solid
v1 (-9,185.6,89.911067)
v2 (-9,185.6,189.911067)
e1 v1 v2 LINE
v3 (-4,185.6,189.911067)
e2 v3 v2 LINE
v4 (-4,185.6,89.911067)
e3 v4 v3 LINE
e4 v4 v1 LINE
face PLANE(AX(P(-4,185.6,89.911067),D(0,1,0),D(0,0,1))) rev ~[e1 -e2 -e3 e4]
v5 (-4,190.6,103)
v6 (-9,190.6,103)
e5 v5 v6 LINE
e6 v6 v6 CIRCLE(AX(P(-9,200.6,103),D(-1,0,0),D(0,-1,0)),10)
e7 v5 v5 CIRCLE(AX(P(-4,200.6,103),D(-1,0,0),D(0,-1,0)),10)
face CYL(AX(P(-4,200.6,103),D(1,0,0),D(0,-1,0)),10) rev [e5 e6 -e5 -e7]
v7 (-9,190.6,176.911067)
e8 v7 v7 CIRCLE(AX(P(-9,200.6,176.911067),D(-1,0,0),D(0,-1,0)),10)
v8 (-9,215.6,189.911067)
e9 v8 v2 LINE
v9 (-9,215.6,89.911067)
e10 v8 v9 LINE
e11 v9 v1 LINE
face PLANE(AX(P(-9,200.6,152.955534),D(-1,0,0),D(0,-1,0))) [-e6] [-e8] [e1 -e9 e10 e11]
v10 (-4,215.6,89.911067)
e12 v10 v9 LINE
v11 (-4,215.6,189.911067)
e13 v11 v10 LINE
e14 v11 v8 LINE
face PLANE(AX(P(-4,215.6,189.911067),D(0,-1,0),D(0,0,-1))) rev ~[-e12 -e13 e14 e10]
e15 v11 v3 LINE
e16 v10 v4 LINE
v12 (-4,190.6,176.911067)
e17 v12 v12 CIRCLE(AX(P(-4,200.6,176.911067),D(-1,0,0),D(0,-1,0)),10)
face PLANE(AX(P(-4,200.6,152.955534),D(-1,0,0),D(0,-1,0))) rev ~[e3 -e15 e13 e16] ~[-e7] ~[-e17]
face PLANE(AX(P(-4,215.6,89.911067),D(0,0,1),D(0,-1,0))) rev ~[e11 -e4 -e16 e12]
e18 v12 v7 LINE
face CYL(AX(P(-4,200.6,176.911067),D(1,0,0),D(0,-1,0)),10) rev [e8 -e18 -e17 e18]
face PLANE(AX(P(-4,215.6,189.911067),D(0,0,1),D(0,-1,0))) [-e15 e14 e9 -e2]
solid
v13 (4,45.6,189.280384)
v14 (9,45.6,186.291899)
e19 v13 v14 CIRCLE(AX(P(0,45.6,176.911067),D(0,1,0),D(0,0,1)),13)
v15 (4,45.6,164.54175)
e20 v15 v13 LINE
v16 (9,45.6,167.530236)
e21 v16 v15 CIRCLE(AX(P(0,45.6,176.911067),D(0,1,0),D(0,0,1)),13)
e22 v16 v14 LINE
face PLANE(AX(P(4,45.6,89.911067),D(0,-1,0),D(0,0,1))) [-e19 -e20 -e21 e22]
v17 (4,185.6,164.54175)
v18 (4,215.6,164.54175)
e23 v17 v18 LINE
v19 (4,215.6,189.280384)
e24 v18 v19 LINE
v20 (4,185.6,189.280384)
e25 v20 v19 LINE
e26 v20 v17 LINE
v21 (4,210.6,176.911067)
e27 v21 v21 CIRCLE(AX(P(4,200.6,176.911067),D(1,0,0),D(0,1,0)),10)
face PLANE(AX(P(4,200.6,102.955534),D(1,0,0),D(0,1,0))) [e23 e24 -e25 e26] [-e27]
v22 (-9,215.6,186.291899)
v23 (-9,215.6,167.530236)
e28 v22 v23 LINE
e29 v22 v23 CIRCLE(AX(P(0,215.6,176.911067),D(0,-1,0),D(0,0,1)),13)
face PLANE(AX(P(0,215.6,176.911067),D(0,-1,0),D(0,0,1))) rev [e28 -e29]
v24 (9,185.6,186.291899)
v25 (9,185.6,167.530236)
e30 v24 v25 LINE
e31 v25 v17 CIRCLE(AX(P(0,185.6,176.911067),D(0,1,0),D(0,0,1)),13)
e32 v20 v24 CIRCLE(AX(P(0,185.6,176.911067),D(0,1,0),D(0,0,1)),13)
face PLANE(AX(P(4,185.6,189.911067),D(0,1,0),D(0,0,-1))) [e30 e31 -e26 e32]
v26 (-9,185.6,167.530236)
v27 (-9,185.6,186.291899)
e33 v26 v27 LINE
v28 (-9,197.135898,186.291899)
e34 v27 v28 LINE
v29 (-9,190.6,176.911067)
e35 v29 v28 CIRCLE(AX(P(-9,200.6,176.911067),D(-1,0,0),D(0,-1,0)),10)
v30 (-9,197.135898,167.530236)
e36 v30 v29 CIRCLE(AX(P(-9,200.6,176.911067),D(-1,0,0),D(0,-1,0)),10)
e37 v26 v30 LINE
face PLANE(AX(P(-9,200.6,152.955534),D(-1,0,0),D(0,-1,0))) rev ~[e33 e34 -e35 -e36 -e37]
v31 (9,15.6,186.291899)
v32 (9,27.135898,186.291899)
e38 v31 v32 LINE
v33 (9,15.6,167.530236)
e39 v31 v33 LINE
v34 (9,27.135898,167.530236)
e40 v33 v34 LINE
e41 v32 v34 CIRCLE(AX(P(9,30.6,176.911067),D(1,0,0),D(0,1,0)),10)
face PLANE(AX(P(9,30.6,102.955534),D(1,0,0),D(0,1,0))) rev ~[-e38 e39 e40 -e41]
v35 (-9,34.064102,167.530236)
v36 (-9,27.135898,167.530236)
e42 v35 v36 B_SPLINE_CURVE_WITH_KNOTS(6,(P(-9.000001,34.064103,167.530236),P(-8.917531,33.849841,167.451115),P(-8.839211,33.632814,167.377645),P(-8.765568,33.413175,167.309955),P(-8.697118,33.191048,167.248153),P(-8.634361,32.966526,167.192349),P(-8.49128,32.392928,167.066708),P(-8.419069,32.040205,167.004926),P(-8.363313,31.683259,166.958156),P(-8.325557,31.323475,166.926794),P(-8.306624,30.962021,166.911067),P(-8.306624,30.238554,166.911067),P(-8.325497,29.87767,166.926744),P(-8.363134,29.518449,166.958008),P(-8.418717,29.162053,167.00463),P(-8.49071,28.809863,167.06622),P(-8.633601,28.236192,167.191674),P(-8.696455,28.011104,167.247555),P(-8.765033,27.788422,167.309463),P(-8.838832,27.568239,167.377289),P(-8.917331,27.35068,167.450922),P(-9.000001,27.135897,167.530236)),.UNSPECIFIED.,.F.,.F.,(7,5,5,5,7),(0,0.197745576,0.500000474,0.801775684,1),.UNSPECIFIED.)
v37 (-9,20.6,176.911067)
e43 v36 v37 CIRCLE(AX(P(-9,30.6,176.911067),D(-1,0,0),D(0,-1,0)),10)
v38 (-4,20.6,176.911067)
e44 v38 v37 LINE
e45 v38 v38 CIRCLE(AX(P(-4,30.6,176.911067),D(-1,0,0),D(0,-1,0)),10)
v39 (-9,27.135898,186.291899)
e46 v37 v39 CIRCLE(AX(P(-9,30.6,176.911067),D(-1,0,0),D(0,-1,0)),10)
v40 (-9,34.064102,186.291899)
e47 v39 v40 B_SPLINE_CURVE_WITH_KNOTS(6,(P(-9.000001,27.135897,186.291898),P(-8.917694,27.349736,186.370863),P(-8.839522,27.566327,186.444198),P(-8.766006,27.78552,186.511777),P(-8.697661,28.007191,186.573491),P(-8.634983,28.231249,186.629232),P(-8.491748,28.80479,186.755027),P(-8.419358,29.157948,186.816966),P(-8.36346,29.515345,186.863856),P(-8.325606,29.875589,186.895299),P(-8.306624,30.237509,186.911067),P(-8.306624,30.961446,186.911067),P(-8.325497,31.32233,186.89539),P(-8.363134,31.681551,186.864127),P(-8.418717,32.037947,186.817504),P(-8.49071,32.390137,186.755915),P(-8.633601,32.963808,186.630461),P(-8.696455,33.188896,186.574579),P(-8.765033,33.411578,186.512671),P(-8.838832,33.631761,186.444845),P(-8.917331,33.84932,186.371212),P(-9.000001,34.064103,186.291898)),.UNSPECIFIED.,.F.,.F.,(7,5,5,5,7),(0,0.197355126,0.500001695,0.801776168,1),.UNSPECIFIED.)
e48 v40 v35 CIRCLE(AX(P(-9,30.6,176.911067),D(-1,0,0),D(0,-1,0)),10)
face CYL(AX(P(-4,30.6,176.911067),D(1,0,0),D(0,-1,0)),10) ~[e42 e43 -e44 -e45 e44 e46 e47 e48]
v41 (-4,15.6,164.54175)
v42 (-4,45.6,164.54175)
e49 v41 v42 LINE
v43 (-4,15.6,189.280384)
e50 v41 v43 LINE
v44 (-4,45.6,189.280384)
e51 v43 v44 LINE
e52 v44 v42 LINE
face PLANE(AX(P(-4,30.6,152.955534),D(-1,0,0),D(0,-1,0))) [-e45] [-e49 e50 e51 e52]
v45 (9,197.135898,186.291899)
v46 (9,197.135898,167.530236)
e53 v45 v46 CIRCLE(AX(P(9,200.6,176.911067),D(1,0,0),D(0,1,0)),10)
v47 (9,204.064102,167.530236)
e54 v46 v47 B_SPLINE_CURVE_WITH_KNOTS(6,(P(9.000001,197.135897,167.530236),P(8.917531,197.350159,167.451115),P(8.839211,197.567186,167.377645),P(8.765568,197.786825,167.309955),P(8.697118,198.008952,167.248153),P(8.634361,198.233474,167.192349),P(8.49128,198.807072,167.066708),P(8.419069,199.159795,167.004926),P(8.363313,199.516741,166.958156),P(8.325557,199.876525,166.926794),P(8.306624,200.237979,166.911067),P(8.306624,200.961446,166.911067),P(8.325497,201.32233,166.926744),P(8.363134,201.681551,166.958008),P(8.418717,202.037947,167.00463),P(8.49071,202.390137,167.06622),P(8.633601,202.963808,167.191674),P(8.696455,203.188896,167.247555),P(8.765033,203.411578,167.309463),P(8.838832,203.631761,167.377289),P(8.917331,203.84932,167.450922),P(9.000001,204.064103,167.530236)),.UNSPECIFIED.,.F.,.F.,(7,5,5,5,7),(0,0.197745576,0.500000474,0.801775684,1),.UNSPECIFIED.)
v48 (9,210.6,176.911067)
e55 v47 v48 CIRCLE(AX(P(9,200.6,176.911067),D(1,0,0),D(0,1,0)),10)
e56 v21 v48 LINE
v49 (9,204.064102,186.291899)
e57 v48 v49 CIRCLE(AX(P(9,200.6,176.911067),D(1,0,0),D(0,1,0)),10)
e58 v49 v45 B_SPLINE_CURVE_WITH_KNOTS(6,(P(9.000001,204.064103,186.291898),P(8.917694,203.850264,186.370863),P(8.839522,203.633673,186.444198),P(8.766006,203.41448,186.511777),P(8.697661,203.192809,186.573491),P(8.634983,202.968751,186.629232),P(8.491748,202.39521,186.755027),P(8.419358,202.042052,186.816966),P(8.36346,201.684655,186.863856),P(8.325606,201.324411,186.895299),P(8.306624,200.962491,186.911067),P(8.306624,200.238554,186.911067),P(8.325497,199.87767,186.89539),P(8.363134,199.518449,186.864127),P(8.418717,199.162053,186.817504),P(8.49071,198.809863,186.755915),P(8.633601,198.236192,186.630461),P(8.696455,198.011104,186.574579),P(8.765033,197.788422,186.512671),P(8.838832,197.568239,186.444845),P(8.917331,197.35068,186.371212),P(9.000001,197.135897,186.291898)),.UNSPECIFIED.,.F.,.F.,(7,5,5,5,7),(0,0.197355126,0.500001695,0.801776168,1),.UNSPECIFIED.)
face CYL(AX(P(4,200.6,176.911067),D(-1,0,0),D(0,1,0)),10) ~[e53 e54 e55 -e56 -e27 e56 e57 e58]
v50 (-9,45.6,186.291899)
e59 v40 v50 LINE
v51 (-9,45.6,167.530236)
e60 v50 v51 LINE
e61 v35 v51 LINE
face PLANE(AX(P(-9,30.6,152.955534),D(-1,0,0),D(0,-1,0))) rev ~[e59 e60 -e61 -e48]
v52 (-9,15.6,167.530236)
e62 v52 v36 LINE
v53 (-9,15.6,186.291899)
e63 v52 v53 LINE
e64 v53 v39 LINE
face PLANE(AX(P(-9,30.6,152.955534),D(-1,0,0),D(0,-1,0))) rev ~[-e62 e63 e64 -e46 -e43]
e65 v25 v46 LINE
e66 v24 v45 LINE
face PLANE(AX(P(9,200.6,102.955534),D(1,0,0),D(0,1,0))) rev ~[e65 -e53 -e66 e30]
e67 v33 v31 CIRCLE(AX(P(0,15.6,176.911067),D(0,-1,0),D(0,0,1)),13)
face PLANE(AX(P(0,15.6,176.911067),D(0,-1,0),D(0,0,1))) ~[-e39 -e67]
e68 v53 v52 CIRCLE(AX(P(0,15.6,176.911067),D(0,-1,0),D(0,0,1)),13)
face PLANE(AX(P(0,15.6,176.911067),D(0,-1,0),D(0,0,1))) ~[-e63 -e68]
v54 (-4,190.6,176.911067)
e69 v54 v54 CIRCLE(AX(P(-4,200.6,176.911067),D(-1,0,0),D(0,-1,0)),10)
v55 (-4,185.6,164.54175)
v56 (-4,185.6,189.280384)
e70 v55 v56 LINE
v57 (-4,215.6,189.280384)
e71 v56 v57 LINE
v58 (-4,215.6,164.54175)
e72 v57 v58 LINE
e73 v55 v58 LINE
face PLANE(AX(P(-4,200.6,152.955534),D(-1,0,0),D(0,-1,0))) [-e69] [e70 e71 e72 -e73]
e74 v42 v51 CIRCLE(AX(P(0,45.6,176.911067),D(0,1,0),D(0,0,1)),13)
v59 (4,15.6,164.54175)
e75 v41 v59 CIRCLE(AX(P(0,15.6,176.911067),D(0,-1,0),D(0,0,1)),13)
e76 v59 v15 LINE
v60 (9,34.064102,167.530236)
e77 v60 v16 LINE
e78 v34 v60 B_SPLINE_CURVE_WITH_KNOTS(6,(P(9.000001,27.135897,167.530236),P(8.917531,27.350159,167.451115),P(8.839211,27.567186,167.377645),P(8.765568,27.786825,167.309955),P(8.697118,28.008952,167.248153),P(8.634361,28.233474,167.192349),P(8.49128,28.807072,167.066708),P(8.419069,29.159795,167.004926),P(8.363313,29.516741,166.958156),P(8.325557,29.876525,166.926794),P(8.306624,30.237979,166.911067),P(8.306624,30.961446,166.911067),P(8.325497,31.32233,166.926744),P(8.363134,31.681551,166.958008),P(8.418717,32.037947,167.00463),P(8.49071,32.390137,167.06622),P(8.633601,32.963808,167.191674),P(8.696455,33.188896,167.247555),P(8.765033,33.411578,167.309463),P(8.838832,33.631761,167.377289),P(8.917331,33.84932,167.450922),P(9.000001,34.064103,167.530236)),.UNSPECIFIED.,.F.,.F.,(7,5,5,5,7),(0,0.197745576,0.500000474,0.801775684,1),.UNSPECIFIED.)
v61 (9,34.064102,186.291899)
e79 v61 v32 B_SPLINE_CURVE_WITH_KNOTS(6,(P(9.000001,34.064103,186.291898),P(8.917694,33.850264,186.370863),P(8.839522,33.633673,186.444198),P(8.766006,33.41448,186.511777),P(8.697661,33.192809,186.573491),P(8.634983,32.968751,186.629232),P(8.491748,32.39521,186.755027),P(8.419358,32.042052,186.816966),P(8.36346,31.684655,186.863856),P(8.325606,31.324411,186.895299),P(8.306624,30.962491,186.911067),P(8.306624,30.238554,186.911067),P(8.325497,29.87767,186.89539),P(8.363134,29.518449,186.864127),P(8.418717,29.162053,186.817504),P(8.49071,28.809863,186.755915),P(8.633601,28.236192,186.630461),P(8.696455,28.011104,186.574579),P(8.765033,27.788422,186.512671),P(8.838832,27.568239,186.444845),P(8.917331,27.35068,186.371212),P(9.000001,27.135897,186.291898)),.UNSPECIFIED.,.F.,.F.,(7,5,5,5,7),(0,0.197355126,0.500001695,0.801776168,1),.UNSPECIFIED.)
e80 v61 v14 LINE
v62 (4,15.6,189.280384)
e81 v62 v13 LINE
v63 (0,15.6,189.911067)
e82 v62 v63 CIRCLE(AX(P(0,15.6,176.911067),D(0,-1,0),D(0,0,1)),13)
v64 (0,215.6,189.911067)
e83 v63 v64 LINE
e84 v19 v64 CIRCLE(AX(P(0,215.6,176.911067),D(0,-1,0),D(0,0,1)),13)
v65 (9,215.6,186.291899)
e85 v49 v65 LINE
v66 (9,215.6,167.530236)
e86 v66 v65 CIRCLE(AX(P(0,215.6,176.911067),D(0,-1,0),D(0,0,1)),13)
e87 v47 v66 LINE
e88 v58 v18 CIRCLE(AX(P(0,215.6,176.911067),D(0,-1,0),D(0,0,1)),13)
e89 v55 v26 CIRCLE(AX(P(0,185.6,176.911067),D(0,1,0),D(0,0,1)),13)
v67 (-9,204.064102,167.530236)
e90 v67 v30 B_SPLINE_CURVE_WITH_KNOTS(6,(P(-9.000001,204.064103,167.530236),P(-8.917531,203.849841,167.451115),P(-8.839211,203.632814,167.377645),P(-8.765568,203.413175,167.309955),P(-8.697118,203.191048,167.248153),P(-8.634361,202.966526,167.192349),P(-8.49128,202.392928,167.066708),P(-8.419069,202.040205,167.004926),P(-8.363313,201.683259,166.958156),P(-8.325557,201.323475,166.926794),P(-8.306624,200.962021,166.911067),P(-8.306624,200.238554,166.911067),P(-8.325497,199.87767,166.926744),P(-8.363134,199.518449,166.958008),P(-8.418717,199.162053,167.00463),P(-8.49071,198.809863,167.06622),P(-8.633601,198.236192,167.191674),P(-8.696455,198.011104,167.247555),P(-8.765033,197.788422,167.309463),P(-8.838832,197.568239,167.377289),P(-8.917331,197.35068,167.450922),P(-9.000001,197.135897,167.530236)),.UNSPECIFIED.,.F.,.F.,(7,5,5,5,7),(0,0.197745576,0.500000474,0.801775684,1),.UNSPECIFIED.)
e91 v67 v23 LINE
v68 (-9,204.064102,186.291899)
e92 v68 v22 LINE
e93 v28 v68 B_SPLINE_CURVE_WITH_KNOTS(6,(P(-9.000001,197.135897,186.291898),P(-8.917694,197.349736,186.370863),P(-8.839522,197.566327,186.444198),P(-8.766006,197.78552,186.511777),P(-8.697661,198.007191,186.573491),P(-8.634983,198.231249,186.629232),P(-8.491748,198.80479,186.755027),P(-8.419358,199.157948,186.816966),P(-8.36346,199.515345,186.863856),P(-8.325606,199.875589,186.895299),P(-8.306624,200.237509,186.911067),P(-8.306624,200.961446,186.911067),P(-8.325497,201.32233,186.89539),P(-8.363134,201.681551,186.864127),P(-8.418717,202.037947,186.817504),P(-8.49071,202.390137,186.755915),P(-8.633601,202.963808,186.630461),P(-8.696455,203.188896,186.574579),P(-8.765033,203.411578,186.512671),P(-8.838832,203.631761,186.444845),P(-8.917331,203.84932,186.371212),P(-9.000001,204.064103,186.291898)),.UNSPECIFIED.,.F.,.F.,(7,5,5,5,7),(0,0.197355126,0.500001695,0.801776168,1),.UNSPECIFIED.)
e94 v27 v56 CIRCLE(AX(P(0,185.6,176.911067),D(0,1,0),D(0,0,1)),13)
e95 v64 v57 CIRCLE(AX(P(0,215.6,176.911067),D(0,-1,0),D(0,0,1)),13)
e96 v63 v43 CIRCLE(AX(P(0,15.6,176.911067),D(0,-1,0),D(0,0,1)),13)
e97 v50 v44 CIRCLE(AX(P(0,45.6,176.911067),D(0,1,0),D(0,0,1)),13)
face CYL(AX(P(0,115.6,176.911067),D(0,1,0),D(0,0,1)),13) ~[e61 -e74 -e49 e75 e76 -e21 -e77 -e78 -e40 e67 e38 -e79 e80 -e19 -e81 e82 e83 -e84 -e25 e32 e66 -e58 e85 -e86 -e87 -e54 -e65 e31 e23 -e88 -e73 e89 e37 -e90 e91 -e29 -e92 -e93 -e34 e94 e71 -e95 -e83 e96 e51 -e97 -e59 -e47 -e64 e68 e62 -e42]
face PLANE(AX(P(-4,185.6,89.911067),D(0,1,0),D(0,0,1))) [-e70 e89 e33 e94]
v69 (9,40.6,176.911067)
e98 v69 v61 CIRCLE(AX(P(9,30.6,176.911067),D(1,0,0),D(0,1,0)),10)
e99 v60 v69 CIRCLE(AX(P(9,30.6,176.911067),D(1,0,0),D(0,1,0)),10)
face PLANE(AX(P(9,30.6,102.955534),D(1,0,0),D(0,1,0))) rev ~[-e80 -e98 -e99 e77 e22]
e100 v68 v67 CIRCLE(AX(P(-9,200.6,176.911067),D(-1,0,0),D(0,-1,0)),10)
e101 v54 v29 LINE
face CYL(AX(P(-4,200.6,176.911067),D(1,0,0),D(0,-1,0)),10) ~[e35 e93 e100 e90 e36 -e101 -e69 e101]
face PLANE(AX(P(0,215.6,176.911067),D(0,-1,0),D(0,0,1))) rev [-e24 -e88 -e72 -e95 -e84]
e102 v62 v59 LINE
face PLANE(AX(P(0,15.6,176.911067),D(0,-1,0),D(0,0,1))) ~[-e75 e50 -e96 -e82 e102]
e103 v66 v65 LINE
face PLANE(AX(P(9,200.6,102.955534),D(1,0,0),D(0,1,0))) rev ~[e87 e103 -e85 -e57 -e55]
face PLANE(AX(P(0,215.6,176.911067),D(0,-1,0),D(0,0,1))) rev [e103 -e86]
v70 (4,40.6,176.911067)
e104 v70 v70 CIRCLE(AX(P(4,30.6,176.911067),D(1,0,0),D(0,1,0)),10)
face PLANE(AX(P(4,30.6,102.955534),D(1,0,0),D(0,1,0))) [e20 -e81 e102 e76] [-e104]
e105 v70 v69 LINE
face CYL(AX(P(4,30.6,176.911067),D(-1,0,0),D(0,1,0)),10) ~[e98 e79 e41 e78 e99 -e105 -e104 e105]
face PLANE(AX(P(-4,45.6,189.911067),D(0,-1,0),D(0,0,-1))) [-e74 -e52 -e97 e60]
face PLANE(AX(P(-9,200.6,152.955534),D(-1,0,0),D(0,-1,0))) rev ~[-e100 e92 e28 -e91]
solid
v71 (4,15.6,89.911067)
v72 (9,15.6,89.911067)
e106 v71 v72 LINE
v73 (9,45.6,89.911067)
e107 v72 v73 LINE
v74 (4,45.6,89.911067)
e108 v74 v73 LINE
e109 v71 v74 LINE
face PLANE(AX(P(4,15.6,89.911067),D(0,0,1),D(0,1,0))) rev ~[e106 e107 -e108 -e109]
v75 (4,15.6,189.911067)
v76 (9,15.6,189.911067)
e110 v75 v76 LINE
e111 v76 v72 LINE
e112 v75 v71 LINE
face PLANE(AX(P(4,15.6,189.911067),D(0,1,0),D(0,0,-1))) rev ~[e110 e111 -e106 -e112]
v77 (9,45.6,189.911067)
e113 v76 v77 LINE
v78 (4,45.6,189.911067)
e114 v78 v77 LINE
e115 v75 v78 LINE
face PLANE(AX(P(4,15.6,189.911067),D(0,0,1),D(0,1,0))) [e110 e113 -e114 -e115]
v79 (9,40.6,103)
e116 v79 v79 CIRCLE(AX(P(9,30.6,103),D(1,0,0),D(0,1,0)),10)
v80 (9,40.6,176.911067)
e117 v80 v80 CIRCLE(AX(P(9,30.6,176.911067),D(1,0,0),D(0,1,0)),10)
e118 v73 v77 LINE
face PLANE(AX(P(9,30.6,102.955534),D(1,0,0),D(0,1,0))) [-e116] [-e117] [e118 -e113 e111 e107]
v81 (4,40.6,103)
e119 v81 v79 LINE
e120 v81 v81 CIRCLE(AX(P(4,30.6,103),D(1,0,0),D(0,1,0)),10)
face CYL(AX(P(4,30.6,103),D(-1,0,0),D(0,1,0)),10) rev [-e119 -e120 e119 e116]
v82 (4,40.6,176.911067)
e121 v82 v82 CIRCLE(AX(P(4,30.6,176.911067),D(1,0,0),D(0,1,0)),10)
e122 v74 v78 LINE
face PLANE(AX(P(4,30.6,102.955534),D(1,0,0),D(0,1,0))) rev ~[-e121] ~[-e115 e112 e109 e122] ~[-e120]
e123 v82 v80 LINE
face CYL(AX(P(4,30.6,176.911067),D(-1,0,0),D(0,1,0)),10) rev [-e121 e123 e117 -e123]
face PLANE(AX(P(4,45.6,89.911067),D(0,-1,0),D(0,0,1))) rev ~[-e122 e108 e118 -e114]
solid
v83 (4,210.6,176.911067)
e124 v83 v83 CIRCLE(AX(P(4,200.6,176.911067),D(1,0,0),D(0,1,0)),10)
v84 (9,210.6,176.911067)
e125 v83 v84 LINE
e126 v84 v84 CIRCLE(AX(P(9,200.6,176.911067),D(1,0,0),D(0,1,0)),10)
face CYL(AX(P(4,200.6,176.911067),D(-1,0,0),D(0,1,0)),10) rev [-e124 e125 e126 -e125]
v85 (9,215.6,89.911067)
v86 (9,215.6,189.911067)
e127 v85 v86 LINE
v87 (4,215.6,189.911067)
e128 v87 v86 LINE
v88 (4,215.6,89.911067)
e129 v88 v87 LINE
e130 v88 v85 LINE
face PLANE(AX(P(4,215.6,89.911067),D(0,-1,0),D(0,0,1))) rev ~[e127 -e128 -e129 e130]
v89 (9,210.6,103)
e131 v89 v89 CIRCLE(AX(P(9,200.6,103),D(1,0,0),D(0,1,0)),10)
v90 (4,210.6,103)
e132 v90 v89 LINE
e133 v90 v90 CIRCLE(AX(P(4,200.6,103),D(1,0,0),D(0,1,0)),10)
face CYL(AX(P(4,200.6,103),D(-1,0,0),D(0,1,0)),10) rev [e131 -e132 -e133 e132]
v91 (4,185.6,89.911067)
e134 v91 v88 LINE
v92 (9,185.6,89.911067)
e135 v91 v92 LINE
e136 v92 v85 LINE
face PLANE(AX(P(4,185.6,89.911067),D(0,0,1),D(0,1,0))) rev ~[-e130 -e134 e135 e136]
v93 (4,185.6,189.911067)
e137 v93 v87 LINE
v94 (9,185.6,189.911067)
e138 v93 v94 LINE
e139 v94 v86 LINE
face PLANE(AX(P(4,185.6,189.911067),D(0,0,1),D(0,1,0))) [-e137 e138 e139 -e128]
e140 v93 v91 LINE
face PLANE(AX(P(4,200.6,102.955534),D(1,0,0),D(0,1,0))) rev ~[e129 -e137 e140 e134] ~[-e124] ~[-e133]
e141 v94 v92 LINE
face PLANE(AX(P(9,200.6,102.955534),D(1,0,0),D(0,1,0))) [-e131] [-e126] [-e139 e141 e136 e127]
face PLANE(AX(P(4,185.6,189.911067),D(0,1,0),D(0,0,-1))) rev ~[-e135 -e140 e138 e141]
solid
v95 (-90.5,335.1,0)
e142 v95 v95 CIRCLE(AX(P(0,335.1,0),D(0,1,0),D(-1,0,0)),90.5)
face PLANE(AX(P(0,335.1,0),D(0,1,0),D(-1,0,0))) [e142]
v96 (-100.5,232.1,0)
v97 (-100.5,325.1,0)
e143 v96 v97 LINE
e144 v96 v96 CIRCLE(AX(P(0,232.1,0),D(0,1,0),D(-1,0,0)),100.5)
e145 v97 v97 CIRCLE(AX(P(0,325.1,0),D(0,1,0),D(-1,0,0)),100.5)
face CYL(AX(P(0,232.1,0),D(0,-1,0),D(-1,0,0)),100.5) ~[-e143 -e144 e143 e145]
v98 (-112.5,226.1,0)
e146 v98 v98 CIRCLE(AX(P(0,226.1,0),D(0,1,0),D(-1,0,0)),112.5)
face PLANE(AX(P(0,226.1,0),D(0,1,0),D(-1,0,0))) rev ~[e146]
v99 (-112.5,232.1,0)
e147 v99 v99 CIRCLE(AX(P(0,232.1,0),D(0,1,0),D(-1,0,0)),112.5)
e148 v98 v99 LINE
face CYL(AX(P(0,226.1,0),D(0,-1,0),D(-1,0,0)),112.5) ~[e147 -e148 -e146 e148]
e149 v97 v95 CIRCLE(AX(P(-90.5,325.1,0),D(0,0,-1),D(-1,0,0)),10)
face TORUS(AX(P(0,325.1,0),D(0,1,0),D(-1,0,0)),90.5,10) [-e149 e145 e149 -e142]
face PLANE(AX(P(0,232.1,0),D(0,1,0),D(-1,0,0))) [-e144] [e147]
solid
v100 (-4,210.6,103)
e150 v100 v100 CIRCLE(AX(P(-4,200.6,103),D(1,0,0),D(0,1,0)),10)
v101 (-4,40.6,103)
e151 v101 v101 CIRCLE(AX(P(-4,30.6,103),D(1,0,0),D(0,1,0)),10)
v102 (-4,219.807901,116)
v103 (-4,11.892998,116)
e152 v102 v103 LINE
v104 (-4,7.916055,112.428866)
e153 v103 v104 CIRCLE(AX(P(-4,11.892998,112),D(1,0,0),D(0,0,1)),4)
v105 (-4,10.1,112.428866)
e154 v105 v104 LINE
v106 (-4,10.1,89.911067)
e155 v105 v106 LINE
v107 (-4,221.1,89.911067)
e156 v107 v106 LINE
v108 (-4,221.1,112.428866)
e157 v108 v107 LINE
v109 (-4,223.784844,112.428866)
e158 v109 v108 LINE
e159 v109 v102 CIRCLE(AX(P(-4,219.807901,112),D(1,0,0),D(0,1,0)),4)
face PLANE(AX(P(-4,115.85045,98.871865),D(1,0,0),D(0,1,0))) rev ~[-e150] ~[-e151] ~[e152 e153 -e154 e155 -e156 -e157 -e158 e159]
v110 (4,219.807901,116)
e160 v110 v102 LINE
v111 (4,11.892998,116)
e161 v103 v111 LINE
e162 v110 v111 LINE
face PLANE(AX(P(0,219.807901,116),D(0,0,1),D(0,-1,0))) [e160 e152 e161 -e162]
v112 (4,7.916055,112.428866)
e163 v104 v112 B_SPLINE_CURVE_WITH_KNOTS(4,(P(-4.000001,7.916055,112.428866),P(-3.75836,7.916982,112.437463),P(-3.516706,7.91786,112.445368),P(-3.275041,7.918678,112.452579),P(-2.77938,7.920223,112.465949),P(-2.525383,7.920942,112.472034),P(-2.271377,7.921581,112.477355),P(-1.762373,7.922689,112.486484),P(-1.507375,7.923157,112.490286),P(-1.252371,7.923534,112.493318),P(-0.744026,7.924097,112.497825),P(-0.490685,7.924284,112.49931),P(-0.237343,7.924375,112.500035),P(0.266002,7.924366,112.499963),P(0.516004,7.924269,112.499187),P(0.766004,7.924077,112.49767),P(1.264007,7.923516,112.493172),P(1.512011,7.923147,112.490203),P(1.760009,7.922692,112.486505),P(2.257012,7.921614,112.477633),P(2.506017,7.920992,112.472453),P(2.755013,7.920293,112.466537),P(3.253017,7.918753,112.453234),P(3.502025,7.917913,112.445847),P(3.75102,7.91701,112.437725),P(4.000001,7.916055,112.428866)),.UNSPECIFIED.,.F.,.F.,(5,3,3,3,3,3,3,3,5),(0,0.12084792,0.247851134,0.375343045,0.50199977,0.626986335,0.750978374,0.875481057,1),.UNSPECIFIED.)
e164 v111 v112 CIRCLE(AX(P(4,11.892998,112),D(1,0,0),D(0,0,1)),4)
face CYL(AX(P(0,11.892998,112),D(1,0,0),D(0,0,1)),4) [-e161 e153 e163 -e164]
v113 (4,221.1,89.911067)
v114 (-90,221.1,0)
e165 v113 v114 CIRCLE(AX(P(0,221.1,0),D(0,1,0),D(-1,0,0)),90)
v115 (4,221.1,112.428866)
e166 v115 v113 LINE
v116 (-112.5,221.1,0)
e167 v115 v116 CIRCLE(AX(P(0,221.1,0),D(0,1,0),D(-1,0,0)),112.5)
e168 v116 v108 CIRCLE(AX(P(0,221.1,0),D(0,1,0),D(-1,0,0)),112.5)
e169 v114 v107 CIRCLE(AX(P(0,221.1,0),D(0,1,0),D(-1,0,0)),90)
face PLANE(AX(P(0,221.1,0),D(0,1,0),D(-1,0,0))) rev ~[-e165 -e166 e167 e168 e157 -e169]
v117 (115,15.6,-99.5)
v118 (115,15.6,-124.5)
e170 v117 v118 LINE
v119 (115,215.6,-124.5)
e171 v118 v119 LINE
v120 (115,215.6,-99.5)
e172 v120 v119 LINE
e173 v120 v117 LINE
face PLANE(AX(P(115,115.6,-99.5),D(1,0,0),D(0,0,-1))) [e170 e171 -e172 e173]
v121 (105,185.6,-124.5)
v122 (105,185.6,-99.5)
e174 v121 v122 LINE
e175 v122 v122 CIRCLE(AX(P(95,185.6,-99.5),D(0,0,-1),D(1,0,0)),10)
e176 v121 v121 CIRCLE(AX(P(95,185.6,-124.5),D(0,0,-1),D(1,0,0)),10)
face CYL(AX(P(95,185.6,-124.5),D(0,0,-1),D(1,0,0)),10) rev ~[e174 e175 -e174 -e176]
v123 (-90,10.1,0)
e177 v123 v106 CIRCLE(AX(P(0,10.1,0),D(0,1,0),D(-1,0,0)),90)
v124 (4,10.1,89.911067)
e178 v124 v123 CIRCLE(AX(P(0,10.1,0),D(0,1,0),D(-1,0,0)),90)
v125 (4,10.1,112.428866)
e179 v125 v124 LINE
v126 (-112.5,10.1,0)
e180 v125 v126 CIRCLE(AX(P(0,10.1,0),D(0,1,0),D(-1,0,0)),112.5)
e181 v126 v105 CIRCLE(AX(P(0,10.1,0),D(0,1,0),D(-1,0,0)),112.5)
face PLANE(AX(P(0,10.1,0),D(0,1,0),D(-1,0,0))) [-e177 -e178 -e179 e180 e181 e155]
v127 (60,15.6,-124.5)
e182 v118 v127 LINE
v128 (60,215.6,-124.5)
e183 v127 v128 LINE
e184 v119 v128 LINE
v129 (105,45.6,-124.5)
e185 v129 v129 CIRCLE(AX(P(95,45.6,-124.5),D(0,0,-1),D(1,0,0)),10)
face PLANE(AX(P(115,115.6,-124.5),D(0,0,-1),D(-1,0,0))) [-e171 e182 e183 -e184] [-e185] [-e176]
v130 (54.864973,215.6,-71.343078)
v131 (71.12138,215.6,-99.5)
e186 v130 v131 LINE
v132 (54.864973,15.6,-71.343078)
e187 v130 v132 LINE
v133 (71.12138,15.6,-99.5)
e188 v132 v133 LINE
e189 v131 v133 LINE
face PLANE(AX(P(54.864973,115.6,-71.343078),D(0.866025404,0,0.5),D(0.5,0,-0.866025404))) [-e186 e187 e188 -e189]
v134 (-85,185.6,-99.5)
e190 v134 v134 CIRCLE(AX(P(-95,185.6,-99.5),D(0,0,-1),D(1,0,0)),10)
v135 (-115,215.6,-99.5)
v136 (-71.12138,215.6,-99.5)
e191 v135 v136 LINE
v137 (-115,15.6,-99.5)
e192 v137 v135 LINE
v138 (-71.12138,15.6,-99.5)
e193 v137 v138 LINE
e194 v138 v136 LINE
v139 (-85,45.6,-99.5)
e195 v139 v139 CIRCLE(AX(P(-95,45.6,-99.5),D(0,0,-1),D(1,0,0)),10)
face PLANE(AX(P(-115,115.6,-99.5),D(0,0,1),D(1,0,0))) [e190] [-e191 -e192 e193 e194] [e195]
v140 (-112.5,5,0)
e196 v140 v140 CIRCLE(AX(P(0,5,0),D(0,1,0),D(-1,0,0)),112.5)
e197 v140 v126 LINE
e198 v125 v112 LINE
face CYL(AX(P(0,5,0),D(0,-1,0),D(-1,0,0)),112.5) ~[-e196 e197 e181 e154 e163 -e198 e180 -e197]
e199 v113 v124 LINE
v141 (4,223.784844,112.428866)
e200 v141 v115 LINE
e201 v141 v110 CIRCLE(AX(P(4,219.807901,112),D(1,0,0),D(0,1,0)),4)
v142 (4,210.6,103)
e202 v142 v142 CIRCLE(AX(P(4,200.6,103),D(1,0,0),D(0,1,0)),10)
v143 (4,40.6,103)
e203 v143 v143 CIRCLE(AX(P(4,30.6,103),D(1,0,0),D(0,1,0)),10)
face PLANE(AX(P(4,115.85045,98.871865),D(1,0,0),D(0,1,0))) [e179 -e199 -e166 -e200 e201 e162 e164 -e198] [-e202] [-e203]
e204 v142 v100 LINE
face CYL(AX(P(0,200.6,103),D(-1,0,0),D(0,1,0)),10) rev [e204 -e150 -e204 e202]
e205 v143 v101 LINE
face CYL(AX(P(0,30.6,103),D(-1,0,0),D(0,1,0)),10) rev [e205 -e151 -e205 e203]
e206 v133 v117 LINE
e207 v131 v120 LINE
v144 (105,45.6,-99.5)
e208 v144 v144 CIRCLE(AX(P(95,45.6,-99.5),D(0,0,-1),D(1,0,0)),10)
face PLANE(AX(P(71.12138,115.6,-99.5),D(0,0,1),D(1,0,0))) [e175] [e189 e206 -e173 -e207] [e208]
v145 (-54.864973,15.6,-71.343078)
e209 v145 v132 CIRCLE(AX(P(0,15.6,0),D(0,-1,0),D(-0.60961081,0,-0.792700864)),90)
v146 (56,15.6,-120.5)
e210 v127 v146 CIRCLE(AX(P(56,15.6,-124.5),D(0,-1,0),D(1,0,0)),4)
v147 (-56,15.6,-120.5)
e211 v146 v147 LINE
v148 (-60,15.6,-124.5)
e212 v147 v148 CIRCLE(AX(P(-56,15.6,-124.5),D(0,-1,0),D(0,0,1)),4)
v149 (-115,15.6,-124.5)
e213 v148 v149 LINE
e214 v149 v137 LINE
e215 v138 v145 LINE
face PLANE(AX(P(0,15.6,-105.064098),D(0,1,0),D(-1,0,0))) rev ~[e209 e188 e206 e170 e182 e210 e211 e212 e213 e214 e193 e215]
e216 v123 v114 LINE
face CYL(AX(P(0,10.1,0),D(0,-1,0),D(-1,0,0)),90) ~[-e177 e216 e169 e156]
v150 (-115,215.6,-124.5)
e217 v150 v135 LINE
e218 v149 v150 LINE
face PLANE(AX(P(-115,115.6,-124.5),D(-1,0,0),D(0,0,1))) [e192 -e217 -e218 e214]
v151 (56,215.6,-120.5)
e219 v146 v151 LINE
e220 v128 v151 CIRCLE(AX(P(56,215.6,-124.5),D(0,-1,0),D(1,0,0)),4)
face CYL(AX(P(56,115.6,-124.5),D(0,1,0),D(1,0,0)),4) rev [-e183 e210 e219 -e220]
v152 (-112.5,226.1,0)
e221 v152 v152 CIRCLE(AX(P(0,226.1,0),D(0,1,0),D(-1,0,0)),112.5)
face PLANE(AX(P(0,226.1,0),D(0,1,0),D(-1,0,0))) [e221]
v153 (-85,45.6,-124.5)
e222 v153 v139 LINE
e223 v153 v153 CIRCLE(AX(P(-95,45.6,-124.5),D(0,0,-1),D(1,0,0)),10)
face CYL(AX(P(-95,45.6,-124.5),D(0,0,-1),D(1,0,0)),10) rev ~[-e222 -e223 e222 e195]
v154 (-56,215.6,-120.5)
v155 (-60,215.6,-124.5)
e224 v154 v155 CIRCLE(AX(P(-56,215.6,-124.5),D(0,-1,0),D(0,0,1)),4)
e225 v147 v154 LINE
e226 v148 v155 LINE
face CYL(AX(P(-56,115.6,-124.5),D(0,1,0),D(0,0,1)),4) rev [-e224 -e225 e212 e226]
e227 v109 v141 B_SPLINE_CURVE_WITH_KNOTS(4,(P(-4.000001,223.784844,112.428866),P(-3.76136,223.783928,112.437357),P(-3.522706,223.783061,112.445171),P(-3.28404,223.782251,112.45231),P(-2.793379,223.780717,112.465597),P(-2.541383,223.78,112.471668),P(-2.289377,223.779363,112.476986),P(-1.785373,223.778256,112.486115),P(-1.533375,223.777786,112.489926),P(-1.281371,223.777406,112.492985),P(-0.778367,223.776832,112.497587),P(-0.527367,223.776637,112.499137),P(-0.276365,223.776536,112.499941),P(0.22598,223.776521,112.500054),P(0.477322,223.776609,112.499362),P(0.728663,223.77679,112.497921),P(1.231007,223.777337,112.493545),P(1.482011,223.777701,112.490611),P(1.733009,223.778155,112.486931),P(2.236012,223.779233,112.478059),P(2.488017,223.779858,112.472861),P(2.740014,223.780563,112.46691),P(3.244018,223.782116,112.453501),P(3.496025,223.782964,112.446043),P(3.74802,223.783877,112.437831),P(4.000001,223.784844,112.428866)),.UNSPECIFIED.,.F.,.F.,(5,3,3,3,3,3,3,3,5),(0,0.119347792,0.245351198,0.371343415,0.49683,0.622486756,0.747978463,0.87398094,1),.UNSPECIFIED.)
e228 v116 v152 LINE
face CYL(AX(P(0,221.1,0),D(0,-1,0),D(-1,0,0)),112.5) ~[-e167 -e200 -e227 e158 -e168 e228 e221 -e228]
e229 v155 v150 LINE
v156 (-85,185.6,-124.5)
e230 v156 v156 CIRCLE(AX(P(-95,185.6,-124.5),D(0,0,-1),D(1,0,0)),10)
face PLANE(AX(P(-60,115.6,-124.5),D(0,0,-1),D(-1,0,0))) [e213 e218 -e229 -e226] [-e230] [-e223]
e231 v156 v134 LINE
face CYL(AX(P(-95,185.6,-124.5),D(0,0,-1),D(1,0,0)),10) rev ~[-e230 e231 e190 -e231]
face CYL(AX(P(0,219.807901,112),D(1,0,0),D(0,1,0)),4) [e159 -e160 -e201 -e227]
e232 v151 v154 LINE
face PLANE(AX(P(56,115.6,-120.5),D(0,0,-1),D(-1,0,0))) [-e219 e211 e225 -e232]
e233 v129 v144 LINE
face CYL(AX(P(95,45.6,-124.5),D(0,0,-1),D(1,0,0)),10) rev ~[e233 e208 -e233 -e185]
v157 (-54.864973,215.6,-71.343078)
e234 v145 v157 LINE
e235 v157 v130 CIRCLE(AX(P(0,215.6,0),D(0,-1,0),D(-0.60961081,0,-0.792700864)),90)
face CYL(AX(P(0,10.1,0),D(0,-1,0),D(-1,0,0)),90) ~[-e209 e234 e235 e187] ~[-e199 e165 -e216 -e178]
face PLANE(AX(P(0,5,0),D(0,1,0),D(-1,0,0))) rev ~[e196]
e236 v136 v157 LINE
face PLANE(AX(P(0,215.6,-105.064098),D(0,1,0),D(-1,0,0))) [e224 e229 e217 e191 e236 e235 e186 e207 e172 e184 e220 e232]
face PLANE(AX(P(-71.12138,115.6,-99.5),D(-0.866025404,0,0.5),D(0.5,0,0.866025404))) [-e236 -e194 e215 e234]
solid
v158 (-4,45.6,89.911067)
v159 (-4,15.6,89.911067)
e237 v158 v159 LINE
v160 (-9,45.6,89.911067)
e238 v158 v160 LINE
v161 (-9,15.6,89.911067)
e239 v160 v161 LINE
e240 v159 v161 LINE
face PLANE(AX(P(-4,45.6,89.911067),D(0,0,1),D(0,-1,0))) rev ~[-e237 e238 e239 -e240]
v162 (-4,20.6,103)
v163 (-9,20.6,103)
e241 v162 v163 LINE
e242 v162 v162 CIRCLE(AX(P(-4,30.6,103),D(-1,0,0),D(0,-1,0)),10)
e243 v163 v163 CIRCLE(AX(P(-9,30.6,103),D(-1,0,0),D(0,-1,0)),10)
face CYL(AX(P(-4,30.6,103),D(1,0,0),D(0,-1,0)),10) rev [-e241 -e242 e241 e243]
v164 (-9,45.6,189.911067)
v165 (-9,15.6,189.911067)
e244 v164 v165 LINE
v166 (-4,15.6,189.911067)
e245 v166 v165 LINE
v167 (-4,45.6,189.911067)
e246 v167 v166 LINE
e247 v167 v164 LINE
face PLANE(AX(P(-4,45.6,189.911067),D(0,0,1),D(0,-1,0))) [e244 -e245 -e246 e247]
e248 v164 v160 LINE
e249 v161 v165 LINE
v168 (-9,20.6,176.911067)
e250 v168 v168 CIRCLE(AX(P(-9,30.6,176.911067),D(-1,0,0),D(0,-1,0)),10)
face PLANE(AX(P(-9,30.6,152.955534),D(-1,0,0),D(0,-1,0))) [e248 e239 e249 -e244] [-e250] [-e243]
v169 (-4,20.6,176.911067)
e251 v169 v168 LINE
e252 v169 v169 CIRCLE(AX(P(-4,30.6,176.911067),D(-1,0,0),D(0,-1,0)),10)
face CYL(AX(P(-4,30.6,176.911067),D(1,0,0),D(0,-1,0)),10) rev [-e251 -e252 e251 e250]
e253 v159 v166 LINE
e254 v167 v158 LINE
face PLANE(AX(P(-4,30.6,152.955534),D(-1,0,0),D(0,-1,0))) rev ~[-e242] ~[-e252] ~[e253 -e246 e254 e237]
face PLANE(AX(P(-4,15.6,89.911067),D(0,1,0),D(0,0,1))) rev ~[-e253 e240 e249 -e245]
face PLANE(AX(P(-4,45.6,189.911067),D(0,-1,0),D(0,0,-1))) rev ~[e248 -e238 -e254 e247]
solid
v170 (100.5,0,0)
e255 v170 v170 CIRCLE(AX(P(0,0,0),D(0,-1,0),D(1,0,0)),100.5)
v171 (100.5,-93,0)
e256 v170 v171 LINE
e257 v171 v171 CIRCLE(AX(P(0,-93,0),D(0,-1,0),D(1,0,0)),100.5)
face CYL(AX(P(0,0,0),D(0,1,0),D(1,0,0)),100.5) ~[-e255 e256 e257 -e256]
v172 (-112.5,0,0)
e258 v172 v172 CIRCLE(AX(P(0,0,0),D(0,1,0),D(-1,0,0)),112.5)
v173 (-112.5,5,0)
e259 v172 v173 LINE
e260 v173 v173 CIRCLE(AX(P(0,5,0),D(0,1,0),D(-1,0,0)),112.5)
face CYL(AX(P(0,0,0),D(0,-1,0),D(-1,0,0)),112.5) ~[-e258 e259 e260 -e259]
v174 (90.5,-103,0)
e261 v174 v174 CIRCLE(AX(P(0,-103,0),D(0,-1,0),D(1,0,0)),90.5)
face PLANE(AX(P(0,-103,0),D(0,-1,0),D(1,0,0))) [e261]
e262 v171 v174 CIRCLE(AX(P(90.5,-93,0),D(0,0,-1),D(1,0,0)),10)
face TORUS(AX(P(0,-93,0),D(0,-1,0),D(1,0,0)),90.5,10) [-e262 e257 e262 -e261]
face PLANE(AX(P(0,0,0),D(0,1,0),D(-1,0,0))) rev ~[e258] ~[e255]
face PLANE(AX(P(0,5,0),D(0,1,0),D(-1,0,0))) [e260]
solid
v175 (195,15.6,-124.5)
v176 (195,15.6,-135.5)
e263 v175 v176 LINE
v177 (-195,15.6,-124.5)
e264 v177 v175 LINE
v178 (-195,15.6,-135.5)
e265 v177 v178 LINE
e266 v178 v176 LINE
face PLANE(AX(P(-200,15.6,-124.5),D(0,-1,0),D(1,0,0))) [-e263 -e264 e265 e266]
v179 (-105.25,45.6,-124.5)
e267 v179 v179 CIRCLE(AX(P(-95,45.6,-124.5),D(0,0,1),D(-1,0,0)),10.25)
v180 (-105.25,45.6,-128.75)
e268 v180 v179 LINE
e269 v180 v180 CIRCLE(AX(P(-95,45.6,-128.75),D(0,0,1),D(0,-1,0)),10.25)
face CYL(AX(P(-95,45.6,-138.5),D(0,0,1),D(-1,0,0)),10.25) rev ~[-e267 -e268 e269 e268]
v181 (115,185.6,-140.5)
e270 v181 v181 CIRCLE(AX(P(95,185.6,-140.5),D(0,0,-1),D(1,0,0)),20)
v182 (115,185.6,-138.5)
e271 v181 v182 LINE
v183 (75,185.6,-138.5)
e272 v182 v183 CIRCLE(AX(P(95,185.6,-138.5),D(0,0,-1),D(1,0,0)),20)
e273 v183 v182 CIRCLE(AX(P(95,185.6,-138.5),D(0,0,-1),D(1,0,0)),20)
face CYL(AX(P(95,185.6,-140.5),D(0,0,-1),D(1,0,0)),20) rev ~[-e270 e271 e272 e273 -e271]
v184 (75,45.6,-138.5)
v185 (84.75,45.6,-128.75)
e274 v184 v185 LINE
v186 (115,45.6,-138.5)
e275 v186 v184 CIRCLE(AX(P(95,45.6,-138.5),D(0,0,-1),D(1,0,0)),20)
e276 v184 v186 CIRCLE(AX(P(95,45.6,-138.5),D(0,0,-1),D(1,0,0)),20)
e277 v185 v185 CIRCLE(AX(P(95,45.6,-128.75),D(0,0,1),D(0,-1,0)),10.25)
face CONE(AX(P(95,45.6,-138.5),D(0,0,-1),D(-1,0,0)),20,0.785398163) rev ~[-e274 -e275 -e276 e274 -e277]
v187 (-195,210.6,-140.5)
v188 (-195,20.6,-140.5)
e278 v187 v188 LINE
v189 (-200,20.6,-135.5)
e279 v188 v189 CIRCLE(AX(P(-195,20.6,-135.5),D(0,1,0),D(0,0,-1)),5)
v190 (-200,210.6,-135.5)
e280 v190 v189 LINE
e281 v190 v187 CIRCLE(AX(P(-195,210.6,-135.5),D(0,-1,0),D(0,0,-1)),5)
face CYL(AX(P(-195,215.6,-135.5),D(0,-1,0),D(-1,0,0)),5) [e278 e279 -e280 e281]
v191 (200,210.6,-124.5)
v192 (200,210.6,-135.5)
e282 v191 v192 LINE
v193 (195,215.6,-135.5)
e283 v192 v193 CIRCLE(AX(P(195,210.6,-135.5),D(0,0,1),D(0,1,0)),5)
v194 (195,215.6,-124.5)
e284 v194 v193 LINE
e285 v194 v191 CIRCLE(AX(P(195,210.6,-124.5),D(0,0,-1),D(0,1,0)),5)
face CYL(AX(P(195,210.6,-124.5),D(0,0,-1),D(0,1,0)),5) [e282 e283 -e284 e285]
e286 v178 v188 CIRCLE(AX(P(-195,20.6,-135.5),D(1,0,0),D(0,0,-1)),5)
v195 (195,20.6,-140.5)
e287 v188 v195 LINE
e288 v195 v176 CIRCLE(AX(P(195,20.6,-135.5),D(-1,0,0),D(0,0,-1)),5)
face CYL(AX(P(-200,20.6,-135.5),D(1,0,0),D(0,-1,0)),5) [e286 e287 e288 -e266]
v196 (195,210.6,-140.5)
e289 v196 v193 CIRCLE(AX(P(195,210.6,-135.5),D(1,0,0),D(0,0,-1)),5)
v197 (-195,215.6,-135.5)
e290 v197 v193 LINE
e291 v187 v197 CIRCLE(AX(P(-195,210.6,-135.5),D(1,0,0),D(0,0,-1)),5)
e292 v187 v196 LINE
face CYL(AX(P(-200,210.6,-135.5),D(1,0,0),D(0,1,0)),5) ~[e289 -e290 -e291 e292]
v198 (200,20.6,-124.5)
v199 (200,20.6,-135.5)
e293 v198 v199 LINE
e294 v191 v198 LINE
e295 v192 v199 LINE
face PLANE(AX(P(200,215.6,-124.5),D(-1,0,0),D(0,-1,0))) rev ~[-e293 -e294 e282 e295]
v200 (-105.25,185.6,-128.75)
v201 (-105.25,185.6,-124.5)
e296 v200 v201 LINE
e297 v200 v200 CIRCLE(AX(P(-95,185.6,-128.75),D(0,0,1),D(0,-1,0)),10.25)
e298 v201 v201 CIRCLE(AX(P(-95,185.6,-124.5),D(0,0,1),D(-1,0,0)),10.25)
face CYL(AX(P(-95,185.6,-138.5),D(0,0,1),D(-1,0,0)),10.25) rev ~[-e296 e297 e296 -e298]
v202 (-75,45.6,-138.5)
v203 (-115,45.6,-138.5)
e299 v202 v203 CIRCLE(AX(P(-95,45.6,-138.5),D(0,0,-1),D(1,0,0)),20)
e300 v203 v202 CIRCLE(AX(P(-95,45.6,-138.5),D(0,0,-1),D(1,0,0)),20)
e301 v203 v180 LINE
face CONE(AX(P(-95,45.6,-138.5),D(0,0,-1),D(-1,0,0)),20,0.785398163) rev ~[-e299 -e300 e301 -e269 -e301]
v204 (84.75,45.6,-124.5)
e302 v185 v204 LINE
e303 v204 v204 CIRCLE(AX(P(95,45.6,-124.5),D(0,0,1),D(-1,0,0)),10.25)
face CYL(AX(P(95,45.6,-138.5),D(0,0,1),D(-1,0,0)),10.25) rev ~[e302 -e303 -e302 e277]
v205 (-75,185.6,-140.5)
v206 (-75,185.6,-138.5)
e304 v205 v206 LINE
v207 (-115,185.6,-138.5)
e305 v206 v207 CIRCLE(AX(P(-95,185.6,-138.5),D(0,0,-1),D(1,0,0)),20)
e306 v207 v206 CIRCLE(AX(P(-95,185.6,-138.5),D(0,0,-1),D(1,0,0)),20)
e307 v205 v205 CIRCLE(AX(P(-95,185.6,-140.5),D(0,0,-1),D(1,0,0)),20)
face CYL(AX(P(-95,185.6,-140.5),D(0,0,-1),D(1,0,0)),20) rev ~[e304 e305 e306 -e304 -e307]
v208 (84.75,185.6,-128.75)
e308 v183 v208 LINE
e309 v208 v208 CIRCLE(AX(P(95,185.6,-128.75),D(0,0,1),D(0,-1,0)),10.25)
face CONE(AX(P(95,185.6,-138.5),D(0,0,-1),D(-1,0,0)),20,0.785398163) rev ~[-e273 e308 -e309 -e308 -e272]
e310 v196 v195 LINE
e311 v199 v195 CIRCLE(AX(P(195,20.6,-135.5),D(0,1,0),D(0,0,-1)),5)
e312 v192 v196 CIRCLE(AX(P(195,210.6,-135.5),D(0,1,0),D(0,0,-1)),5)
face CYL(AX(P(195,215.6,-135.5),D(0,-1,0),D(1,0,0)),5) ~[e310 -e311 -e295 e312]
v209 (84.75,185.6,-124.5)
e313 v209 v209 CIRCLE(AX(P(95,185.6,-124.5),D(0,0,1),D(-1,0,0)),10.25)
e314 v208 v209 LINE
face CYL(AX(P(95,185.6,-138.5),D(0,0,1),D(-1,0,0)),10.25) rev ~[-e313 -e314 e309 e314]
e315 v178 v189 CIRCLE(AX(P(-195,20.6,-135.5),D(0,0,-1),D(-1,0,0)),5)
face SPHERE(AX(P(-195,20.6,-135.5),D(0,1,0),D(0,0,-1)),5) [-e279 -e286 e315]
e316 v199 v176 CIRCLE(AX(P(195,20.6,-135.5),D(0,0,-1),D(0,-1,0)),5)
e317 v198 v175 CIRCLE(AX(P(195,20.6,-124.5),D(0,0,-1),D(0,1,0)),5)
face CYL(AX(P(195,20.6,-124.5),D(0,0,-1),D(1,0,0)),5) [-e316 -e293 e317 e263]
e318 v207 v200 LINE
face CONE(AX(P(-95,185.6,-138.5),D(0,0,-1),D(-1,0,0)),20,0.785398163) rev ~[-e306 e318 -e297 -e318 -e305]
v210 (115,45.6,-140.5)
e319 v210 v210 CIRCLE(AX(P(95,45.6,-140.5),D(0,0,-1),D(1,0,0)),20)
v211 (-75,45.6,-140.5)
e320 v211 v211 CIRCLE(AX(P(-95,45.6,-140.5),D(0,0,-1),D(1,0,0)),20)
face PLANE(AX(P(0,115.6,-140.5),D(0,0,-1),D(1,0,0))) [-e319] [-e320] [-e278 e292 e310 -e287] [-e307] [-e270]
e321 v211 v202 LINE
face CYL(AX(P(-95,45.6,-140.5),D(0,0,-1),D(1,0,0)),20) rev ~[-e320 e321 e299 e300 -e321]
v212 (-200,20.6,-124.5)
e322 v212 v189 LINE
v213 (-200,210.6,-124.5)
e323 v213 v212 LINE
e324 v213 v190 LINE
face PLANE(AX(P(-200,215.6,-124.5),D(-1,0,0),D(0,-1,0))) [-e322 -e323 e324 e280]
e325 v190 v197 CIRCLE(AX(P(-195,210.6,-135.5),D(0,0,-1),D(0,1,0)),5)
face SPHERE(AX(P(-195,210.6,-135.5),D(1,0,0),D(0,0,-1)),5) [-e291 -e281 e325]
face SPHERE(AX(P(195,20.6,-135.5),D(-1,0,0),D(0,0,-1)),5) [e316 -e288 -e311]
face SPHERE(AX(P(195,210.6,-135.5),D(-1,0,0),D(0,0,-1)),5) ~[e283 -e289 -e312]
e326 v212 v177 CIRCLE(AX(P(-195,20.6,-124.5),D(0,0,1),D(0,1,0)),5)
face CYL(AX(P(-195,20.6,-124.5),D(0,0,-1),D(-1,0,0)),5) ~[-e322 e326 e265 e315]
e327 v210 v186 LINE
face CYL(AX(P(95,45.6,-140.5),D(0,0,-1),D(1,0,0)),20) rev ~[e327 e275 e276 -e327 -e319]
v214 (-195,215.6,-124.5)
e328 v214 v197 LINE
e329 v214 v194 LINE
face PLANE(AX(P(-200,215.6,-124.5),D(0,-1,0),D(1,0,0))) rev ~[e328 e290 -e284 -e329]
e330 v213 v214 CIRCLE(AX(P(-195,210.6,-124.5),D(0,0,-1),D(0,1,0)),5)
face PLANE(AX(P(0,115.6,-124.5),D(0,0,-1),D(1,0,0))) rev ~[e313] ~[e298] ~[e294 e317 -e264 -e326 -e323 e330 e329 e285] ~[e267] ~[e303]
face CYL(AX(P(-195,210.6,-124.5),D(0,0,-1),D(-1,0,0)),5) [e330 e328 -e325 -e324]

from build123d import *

# Parameters (mm, degrees)
F0_R            = 100.5
F1_DEPTH        = 103
F2_R            = 10
F3_R            = 112.5
F3_R_2          = 100.5
F4_DEPTH        = 5
F5_R            = 112.5
F6_DEPTH        = 5.1
F7_R            = 90
F8_DEPTH        = 211
F9_R            = 112.5
F9_R_2          = 90
F10_DEPTH       = 5
F11_R           = 112.5
F12_DEPTH       = 6
F13_R           = 100.5
F14_DEPTH       = 103
F15_R           = 10
F18_DEPTH       = 100
F19_R           = 10
F20_DEPTH       = 25
F21_W           = 400
F21_H           = 200
F21_R           = 10
F22_DEPTH       = 16
F23_R           = 5
F24_R           = 20
F27_DEPTH       = 2
F28_D           = 20.5
F28_DEPTH       = 25
F28_CSINK_D     = 40
F28_CSINK_ANGLE = 90
F28_TIP         = 6.158821345
F29_R           = 10
F30_DEPTH       = 4
F31_W           = 30
F31_H           = 26.088932828
F31_R           = 10
F31_H_2         = 73.911067172
F32_DEPTH       = 5
F33_W           = 30
F33_H           = 73.911067172
F33_R           = 10
F33_H_2         = 26.088932828
F34_DEPTH       = 5
F35_W           = 200
F35_H           = 13


with BuildPart() as f1:
    # F0 (on Front) → F1 (new body)
    with BuildSketch(Plane.XZ):
        Circle(F0_R)
    extrude(amount=F1_DEPTH)

    # F2
    f2_edges = [f1.edges().sort_by_distance(p)[0] for p in [
        (-100.5, -103, 0),
    ]]
    fillet(f2_edges, radius=F2_R)

    # F3 (on face) → F4 (join)
    with BuildSketch(Plane(origin=(0, 0, 0), x_dir=(-1, 0, 0), z_dir=(0, 1, 0))):
        Circle(F3_R)
        Circle(F3_R_2, mode=Mode.SUBTRACT)
        Circle(F3_R_2)
    extrude(amount=F4_DEPTH)


with BuildPart() as f6:
    # F5 (on face) → F6 (new body)
    with BuildSketch(Plane(origin=(0, 5, 0), x_dir=(-1, 0, 0), z_dir=(0, 1, 0))):
        Circle(F5_R)
    extrude(amount=F6_DEPTH)

    # F7 (on face) → F8 (join)
    with BuildSketch(Plane(origin=(0, 10.1, 0), x_dir=(-1, 0, 0), z_dir=(0, 1, 0))):
        Circle(F7_R)
    extrude(amount=F8_DEPTH)

    # F9 (on face) → F10 (join)
    with BuildSketch(Plane(origin=(0, 221.1, 0), x_dir=(-1, 0, 0), z_dir=(0, 1, 0))):
        Circle(F9_R)
        Circle(F9_R_2, mode=Mode.SUBTRACT)
        Circle(F9_R_2)
    extrude(amount=F10_DEPTH)

    # F17 (on offset) → F18 (join, symmetric)
    with BuildSketch(Plane(origin=(0, 115.6, 0), x_dir=(-1, 0, 0), z_dir=(0, 1, 0))):
        with BuildLine():
            Line((-115, -99.5), (-115, -124.5))
            Line((-115, -124.5), (-60, -124.5))
            ThreePointArc((-60, -124.5), (-58.8284271247, -121.6715728753), (-56, -120.5))
            Line((-56, -120.5), (56, -120.5))
            ThreePointArc((56, -120.5), (58.8284271247, -121.6715728753), (60, -124.5))
            Line((60, -124.5), (115, -124.5))
            Line((115, -124.5), (115, -99.5))
            Line((115, -99.5), (71.1213795416, -99.5))
            Line((71.1213795416, -99.5), (54.8649729171, -71.3430777778))
            ThreePointArc((54.8649729171, -71.3430777778), (0, -90), (-54.8649729171, -71.3430777778))
            Line((-54.8649729171, -71.3430777778), (-71.1213795416, -99.5))
            Line((-71.1213795416, -99.5), (-115, -99.5))
        make_face()
    extrude(amount=F18_DEPTH, both=True)

    # F19 (on face) → F20 (cut)
    with BuildSketch(Plane(origin=(0, 0, -124.5), x_dir=(1, 0, 0), z_dir=(0, 0, -1))):
        with Locations((95, -45.6)):
            Circle(F19_R)
        with Locations((95, -185.6)):
            Circle(F19_R)
        with Locations((-95, -45.6)):
            Circle(F19_R)
        with Locations((-95, -185.6)):
            Circle(F19_R)
    extrude(amount=-F20_DEPTH, mode=Mode.SUBTRACT)

    # F29 (on Right) → F30 (join, symmetric)
    with BuildSketch(Plane.YZ):
        with BuildLine():
            Line((219.807901144, 116), (11.8929979354, 116))
            ThreePointArc((11.8929979354, 116), (9.0645708107, 114.8284271247), (7.8929979354, 112))
            Line((7.8929979354, 112), (7.8929979354, 82))
            Line((7.8929979354, 82), (223.807901144, 82))
            Line((223.807901144, 82), (223.807901144, 112))
            ThreePointArc((223.807901144, 112), (222.6363282688, 114.8284271247), (219.807901144, 116))
        make_face()
        with Locations((30.6, 103)):
            Circle(F29_R, mode=Mode.SUBTRACT)
        with Locations((200.6, 103)):
            Circle(F29_R, mode=Mode.SUBTRACT)
    extrude(amount=F30_DEPTH, both=True)


with BuildPart() as f12:
    # F11 (on face) → F12 (new body)
    with BuildSketch(Plane(origin=(0, 226.1, 0), x_dir=(-1, 0, 0), z_dir=(0, 1, 0))):
        Circle(F11_R)
    extrude(amount=F12_DEPTH)

    # F13 (on face) → F14 (join)
    with BuildSketch(Plane(origin=(0, 232.1, 0), x_dir=(-1, 0, 0), z_dir=(0, 1, 0))):
        Circle(F13_R)
    extrude(amount=F14_DEPTH)

    # F15
    f15_edges = [f12.edges().sort_by_distance(p)[0] for p in [
        (100.5, 335.1, 0),
    ]]
    fillet(f15_edges, radius=F15_R)


with BuildPart() as f22:
    # F21 (on face) → F22 (new body)
    with BuildSketch(Plane(origin=(0, 0, -124.5), x_dir=(1, 0, 0), z_dir=(0, 0, -1))):
        with Locations((0, -115.6)):
            Rectangle(F21_W, F21_H)
        with Locations((-95, -185.6)):
            Circle(F21_R, mode=Mode.SUBTRACT)
        with Locations((95, -185.6)):
            Circle(F21_R, mode=Mode.SUBTRACT)
        with Locations((-95, -45.6)):
            Circle(F21_R, mode=Mode.SUBTRACT)
        with Locations((95, -45.6)):
            Circle(F21_R, mode=Mode.SUBTRACT)
        with Locations((-95, -45.6)):
            Circle(F21_R)
        with Locations((95, -45.6)):
            Circle(F21_R)
        with Locations((95, -185.6)):
            Circle(F21_R)
        with Locations((-95, -185.6)):
            Circle(F21_R)
    extrude(amount=F22_DEPTH)

    # F23
    f23_edges = [f22.edges().sort_by_distance(p)[0] for p in [
        (0, 215.6, -140.5),
        (-200, 115.6, -140.5),
        (0, 15.6, -140.5),
        (200, 115.6, -140.5),
        (-200, 215.6, -132.5),
        (-200, 15.6, -132.5),
        (200, 215.6, -132.5),
        (200, 15.6, -132.5),
    ]]
    fillet(f23_edges, radius=F23_R)

    # F24 (on face) → F27 (cut)
    with BuildSketch(Plane(origin=(0, 0, -140.5), x_dir=(1, 0, 0), z_dir=(0, 0, -1))):
        with Locations((-95, -45.6)):
            Circle(F24_R)
        with Locations((95, -45.6)):
            Circle(F24_R)
        with Locations((-95, -185.6)):
            Circle(F24_R)
        with Locations((95, -185.6)):
            Circle(F24_R)
    extrude(amount=-F27_DEPTH, mode=Mode.SUBTRACT)

    # F28
    with Locations(Plane(origin=(0, 0, -138.5), x_dir=(1, 0, 0), z_dir=(0, 0, -1))):
        with Locations((-95, -45.6), (95, -45.6), (-95, -185.6), (95, -185.6)):
            CounterSinkHole(F28_D / 2, F28_CSINK_D / 2, depth=F28_DEPTH, counter_sink_angle=F28_CSINK_ANGLE)
            with Locations((0, 0, -(F28_DEPTH + F28_TIP / 2))):  # 118° drill point
                Cone(0, F28_D / 2, F28_TIP, mode=Mode.SUBTRACT)


with BuildPart() as f32:
    # F31 (on face) → F32 (new body)
    with BuildSketch(Plane.YZ.offset(4)):
        with Locations((30.6, 102.955533586)):
            Rectangle(F31_W, F31_H)
        with Locations((30.6, 103)):
            Circle(F31_R, mode=Mode.SUBTRACT)
        with Locations((30.6, 152.955533586)):
            Rectangle(F31_W, F31_H_2)
        with Locations((30.6, 176.911067172)):
            Circle(F31_R, mode=Mode.SUBTRACT)
    extrude(amount=F32_DEPTH)


with BuildPart() as f32b:
    # F31 (on face) → F32, piece 2 (new body)
    with BuildSketch(Plane.YZ.offset(4)):
        with Locations((200.6, 102.955533586)):
            Rectangle(F31_W, F31_H)
        with Locations((200.6, 103)):
            Circle(F31_R, mode=Mode.SUBTRACT)
        with Locations((200.6, 152.955533586)):
            Rectangle(F31_W, F31_H_2)
        with Locations((200.6, 176.911067172)):
            Circle(F31_R, mode=Mode.SUBTRACT)
    extrude(amount=F32_DEPTH)


with BuildPart() as f34:
    # F33 (on face) → F34 (new body)
    with BuildSketch(Plane(origin=(-4, 0, 0), x_dir=(0, -1, 0), z_dir=(-1, 0, 0))):
        with Locations((-200.6, 152.955533586)):
            Rectangle(F33_W, F33_H)
        with Locations((-200.6, 176.911067172)):
            Circle(F33_R, mode=Mode.SUBTRACT)
        with Locations((-200.6, 102.955533586)):
            Rectangle(F33_W, F33_H_2)
        with Locations((-200.6, 103)):
            Circle(F33_R, mode=Mode.SUBTRACT)
    extrude(amount=F34_DEPTH)


with BuildPart() as f34b:
    # F33 (on face) → F34, piece 2 (new body)
    with BuildSketch(Plane(origin=(-4, 0, 0), x_dir=(0, -1, 0), z_dir=(-1, 0, 0))):
        with Locations((-30.6, 152.955533586)):
            Rectangle(F33_W, F33_H)
        with Locations((-30.6, 176.911067172)):
            Circle(F33_R, mode=Mode.SUBTRACT)
        with Locations((-30.6, 102.955533586)):
            Rectangle(F33_W, F33_H_2)
        with Locations((-30.6, 103)):
            Circle(F33_R, mode=Mode.SUBTRACT)
    extrude(amount=F34_DEPTH)


with BuildPart() as f36:
    # F35 (on Right) → F36 (revolve)
    with BuildSketch(Plane.YZ):
        with Locations((115.6, 183.411067172)):
            Rectangle(F35_W, F35_H)
    revolve(axis=Axis((0, 115.6, 176.911067172), (0, -1, 0)))

    # F37: cut F34b, F32, F34, F32b
    add(f34b.part, mode=Mode.SUBTRACT)
    add(f32.part, mode=Mode.SUBTRACT)
    add(f34.part, mode=Mode.SUBTRACT)
    add(f32b.part, mode=Mode.SUBTRACT)


solid = Compound([f1.part, f6.part, f12.part, f22.part, f32.part, f32b.part, f34.part, f34b.part, f36.part])
